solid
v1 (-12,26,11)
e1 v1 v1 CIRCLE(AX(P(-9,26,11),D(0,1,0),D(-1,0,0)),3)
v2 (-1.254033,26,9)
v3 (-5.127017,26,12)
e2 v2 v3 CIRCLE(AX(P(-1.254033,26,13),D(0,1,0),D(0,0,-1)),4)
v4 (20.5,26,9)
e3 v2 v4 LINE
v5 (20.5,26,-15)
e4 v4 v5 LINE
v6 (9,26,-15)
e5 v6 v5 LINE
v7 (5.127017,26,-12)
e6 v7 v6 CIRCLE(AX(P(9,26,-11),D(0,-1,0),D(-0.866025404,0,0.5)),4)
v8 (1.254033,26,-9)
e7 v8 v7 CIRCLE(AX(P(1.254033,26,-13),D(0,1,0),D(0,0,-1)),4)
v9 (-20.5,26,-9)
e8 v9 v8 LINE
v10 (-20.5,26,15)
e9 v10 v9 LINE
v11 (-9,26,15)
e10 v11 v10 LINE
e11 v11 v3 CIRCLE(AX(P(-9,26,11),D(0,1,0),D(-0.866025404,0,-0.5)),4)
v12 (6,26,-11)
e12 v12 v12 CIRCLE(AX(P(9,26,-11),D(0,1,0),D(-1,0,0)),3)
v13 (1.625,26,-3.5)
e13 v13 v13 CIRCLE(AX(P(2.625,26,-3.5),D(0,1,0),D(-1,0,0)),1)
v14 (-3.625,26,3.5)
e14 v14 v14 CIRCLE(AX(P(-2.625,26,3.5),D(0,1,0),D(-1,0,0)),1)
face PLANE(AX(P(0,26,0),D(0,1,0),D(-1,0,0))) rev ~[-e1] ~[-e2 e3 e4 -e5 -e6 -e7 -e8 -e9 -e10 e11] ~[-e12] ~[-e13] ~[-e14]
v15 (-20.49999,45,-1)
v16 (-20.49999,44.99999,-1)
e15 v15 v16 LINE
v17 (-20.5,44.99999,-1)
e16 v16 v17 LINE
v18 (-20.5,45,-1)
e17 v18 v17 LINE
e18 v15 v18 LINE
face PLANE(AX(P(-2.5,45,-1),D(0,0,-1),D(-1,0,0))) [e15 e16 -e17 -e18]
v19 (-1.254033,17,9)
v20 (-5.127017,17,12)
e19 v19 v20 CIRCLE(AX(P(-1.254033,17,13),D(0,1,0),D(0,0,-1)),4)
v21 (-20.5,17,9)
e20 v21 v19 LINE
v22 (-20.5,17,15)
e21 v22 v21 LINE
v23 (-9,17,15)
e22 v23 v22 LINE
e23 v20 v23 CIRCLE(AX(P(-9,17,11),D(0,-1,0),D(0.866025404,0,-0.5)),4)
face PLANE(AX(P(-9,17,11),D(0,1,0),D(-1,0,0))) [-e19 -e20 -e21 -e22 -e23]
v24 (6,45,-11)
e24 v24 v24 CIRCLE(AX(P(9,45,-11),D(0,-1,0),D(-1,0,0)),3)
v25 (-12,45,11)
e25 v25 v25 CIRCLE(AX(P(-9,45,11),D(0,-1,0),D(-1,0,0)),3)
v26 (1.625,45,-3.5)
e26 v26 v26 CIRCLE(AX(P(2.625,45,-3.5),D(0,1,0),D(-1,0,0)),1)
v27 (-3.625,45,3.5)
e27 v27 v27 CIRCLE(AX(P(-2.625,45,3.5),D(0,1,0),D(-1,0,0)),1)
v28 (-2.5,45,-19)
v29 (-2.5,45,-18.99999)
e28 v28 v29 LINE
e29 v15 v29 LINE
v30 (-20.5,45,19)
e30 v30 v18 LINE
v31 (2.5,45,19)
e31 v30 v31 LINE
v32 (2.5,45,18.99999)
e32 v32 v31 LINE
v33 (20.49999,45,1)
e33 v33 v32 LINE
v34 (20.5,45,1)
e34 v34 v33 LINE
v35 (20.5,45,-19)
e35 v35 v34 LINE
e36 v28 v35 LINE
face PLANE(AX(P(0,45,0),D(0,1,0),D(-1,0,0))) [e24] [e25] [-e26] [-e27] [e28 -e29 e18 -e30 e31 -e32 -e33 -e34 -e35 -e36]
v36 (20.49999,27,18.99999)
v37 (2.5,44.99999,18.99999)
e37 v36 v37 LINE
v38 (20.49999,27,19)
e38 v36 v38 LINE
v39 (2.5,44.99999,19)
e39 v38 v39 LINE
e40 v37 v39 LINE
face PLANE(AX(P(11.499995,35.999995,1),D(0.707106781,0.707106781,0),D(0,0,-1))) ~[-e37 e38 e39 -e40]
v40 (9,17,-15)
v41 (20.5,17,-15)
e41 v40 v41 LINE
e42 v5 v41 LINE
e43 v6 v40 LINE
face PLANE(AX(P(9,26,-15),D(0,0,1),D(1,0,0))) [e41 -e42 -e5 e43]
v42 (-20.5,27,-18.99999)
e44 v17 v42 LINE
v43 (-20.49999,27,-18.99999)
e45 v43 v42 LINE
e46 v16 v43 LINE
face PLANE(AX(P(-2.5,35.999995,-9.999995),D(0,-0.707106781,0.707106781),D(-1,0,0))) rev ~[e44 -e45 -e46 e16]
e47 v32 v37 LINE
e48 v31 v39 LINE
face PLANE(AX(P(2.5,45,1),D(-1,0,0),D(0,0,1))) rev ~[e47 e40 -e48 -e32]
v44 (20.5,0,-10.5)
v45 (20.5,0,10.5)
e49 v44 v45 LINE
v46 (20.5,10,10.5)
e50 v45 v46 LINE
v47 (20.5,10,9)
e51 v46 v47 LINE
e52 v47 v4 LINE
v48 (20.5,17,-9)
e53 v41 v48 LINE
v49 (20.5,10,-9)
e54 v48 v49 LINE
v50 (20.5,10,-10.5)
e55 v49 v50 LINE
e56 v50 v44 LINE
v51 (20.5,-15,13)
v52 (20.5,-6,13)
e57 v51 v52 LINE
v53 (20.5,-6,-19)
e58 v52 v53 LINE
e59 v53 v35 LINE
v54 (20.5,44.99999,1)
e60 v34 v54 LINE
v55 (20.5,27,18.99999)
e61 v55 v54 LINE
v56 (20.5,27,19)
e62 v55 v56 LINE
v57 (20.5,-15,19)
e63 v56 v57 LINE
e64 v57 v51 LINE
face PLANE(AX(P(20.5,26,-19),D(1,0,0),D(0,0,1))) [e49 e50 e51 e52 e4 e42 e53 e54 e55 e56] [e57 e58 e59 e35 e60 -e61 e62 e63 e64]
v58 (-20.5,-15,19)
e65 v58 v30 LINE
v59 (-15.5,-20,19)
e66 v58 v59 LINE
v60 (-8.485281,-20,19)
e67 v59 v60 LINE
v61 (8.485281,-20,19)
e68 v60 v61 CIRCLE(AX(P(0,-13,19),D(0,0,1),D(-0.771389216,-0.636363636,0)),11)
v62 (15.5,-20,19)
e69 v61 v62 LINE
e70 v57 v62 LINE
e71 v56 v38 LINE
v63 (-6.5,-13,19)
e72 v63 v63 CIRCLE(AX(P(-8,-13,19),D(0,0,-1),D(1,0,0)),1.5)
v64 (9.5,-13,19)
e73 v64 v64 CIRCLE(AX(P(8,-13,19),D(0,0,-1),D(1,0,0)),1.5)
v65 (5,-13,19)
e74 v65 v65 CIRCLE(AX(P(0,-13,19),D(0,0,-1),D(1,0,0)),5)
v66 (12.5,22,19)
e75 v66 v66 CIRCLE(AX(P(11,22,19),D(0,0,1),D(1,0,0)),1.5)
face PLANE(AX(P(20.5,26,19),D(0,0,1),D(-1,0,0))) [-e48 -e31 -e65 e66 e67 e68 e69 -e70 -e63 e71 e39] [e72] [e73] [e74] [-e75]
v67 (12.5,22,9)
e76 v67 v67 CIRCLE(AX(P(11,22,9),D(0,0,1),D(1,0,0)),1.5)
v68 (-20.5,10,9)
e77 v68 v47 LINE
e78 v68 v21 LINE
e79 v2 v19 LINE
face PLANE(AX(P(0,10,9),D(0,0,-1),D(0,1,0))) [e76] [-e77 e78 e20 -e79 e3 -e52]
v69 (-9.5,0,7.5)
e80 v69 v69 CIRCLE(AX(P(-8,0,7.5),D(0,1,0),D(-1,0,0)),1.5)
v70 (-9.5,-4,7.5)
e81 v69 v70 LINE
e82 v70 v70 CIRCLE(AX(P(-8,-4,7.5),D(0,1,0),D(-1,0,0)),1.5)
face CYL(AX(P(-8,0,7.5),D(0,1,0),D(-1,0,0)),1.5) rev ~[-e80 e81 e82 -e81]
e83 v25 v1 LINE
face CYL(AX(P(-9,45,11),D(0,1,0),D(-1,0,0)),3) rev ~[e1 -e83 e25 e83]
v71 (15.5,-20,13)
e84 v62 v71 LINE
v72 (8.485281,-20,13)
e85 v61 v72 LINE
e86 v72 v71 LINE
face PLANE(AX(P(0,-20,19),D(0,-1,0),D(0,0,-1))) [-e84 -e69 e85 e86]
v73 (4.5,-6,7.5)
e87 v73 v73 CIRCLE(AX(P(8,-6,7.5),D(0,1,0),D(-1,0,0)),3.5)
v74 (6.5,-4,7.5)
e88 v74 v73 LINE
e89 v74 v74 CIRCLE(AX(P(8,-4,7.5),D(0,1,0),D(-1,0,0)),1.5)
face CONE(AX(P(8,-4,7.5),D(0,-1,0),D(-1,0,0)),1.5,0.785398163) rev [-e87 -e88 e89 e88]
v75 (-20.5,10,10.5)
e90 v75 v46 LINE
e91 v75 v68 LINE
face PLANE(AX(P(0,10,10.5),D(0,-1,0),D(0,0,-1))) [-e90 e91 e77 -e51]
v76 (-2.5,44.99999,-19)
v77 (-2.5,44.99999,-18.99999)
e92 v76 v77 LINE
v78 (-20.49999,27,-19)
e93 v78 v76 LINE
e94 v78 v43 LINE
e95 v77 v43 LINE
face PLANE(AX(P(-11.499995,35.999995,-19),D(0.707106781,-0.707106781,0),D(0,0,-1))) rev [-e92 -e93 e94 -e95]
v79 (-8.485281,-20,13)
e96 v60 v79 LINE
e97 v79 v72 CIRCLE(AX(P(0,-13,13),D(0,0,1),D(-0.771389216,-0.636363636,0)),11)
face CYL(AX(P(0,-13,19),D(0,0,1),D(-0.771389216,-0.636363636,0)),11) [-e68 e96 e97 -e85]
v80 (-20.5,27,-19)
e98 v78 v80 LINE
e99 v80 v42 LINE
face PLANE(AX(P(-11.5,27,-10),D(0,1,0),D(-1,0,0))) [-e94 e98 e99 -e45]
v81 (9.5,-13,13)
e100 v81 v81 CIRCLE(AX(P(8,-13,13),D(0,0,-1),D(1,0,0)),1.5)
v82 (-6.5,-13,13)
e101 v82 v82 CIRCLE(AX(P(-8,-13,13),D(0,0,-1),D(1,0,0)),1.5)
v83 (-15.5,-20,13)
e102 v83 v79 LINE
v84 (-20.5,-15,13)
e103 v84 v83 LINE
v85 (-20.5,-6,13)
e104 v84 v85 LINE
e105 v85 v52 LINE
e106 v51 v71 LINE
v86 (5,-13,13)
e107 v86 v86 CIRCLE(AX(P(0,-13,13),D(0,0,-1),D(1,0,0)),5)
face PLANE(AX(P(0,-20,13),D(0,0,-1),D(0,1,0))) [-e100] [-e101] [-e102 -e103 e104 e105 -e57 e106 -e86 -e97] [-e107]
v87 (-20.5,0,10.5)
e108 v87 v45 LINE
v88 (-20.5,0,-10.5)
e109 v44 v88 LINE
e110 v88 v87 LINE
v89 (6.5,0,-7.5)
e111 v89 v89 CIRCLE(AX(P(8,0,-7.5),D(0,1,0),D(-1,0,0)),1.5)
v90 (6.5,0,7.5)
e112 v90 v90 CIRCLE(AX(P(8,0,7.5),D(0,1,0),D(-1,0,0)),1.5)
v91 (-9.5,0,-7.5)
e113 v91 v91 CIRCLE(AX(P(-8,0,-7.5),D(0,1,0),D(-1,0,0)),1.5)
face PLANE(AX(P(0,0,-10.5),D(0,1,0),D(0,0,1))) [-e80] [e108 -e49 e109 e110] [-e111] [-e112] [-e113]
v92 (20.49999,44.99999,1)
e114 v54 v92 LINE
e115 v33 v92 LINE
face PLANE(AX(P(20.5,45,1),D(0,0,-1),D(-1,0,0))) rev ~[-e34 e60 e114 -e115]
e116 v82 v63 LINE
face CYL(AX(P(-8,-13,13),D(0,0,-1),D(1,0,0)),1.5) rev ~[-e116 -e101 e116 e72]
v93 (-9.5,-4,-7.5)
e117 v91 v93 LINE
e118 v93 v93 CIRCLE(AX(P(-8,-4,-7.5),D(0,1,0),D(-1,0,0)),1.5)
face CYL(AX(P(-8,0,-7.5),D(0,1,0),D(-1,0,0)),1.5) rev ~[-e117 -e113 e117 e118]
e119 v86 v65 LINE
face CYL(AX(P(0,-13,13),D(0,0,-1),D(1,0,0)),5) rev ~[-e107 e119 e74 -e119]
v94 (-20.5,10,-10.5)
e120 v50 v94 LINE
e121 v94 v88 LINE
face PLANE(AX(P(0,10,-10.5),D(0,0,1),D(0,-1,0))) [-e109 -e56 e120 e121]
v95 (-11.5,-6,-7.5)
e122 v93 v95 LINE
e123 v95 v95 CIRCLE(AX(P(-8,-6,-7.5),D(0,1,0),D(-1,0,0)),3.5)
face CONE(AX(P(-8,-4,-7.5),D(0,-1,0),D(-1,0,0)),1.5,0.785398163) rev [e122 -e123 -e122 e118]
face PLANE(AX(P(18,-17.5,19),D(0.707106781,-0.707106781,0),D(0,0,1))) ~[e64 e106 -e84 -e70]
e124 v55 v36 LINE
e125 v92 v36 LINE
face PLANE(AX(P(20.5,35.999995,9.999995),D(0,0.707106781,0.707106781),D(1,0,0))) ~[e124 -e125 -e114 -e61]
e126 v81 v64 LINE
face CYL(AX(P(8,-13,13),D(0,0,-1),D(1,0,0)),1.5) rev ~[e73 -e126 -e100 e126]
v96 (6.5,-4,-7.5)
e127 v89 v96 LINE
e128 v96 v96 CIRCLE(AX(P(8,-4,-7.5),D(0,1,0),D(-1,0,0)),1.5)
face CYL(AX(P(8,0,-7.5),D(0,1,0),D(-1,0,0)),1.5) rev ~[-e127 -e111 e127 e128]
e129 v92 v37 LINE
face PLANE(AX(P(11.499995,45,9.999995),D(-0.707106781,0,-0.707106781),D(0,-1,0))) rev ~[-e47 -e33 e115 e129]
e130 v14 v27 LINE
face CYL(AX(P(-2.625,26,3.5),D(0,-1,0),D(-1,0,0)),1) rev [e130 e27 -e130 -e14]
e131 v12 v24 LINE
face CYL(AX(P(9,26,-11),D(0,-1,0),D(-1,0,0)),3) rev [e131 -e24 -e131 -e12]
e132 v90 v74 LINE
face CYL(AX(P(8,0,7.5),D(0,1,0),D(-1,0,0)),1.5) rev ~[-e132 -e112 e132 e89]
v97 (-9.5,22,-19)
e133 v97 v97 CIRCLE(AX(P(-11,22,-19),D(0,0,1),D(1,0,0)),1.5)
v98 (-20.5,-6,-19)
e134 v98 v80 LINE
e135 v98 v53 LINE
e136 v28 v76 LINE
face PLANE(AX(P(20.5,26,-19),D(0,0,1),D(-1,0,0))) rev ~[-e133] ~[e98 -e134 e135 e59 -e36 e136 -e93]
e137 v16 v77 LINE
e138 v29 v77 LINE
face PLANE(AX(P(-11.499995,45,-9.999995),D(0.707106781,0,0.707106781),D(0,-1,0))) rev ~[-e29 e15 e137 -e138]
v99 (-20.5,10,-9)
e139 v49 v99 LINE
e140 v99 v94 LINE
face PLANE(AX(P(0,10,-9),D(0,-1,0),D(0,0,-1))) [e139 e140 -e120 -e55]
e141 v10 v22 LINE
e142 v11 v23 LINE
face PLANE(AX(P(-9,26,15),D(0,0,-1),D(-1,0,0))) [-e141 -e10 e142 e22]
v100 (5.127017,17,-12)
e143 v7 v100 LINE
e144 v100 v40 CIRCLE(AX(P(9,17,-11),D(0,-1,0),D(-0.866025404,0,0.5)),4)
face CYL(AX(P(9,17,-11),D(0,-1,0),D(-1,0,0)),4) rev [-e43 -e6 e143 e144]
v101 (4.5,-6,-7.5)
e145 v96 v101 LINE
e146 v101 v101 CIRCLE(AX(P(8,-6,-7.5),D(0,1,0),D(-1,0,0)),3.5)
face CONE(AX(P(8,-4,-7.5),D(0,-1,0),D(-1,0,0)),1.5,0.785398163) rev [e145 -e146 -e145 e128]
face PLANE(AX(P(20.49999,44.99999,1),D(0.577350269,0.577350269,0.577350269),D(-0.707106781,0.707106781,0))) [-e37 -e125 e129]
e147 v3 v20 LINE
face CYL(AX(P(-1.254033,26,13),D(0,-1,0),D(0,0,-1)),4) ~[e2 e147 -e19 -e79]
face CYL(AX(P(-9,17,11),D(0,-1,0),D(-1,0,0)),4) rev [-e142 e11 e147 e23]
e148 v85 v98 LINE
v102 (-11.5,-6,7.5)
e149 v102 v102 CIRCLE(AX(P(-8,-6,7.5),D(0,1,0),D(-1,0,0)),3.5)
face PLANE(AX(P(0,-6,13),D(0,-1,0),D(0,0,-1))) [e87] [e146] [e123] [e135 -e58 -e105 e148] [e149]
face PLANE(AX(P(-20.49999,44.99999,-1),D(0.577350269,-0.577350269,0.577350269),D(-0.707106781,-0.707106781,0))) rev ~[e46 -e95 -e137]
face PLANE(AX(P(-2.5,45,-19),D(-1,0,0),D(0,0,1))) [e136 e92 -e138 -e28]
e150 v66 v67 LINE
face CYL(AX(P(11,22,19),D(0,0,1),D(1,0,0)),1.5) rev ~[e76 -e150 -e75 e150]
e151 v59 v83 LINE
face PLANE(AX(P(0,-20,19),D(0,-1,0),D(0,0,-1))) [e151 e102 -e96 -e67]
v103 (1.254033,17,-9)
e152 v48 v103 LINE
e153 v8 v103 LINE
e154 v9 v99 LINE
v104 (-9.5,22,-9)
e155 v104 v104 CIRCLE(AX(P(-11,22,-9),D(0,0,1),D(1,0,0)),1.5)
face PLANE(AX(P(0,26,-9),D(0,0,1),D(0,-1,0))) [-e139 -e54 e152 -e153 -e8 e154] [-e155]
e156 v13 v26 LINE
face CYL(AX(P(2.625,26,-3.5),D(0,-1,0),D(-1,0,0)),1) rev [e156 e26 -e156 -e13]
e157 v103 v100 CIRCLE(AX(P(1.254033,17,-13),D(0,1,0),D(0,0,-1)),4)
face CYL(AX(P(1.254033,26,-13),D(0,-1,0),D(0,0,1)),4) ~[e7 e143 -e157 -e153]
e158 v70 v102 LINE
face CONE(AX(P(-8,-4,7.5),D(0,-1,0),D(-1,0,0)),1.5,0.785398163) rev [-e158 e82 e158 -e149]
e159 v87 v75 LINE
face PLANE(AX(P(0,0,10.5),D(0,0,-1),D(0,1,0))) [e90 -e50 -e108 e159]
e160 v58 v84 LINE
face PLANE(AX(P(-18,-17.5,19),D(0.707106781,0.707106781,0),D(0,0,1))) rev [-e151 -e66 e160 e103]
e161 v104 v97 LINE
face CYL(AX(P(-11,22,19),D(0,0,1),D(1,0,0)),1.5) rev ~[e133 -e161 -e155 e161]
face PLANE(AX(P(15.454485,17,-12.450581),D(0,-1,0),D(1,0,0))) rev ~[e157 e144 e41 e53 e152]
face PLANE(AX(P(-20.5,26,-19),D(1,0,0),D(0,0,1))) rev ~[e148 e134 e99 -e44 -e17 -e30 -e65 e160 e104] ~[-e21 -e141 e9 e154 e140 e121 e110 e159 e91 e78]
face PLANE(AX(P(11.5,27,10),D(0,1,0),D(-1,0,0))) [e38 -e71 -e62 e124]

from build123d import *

# Parameters (mm, degrees)
F1_DEPTH  = 20.5
F2_R      = 1.5
F2_R_2    = 5
F3_DEPTH  = 6.001
F5_DEPTH  = 6
F6_R      = 1.5
F7_DEPTH  = 24.001
F8_SIZE   = 2
F9_R      = 1.5
F10_DEPTH = 38.001
F11_W     = 41
F11_H     = 38
F11_R     = 3
F11_R_2   = 1
F12_DEPTH = 19
F13_R     = 3
F14_DEPTH = 28
F16_DEPTH = 28
F17_R     = 4
F18_DEPTH = 9
F19_W     = 18
F19_H     = 18
F20_DEPTH = 18
F21_SIZE  = 17.99999
F22_SIZE  = 5
F24_DEPTH = 9
F25_R     = 4


# Not quite as in the source:
# - a fillet or chamfer is up to 0.001 mm smaller than in the source, because OpenCascade refuses the exact size


with BuildPart() as f1:
    # F0 (on Right) → F1 (new body, symmetric)
    with BuildSketch(Plane.YZ):
        Polygon((0, -10.5), (0, 10.5), (10, 10.5), (10, 9), (26, 9), (26, 19), (-20, 19), (-20, 13), (-6, 13), (-6, -19), (26, -19), (26, -9), (10, -9), (10, -10.5), align=None)
    extrude(amount=F1_DEPTH, both=True)

    # F2 (on face) → F3 (cut, through all)
    with BuildSketch(Plane(origin=(0, 0, 13), x_dir=(1, 0, 0), z_dir=(0, 0, -1))):
        with Locations((-8, 13)):
            Circle(F2_R)
        with Locations((8, 13)):
            Circle(F2_R)
        with Locations((0, 13)):
            Circle(F2_R_2)
    extrude(amount=-F3_DEPTH, mode=Mode.SUBTRACT)

    # F4 (on face) → F5 (join, through all)
    with BuildSketch(Plane.XY.offset(19)):
        with BuildLine():
            ThreePointArc((-8.4852813742, -20), (0, -24), (8.4852813742, -20))
            Line((8.4852813742, -20), (-8.4852813742, -20))
        make_face()
    extrude(amount=-F5_DEPTH)

    # F6 (on face) → F7 (cut, through all)
    with BuildSketch(Plane(origin=(0, 0, 0), x_dir=(-1, 0, 0), z_dir=(0, 1, 0))):
        with Locations((-8, 7.5)):
            Circle(F6_R)
        with Locations((8, 7.5)):
            Circle(F6_R)
        with Locations((8, -7.5)):
            Circle(F6_R)
        with Locations((-8, -7.5)):
            Circle(F6_R)
    extrude(amount=-F7_DEPTH, mode=Mode.SUBTRACT)

    # F8
    f8_edges = [f1.edges().sort_by_distance(p)[0] for p in [
        (-6.5, -6, 7.5),
        (9.5, -6, 7.5),
        (9.5, -6, -7.5),
        (-6.5, -6, -7.5),
    ]]
    chamfer(f8_edges, length=F8_SIZE)

    # F9 (on face) → F10 (cut, through all)
    with BuildSketch(Plane.XY.offset(19)):
        with Locations((-11, 22)):
            Circle(F9_R)
        with Locations((11, 22)):
            Circle(F9_R)
    extrude(amount=-F10_DEPTH, mode=Mode.SUBTRACT)

    # F11 (on face) → F12 (join)
    with BuildSketch(Plane(origin=(0, 26, 0), x_dir=(-1, 0, 0), z_dir=(0, 1, 0))):
        Rectangle(F11_W, F11_H)
        with Locations((-9, -11)):
            Circle(F11_R, mode=Mode.SUBTRACT)
        with Locations((-2.625, -3.5)):
            Circle(F11_R_2, mode=Mode.SUBTRACT)
        with Locations((2.625, 3.5)):
            Circle(F11_R_2, mode=Mode.SUBTRACT)
        with Locations((9, 11)):
            Circle(F11_R, mode=Mode.SUBTRACT)
    extrude(amount=F12_DEPTH)

    # F13 (on face) → F14 (cut)
    with BuildSketch(Plane(origin=(0, 45, 0), x_dir=(-1, 0, 0), z_dir=(0, 1, 0))):
        with Locations((9, 11)):
            Circle(F13_R)
        with Locations((-9, -11)):
            Circle(F13_R)
    extrude(amount=-F14_DEPTH, mode=Mode.SUBTRACT)

    # F15 (on face) → F16 (join, through all)
    with BuildSketch(Plane(origin=(0, 17, 0), x_dir=(-1, 0, 0), z_dir=(0, 1, 0))):
        with BuildLine():
            ThreePointArc((6.7639320225, 9), (9, 14), (11.2360679775, 9))
            Line((11.2360679775, 9), (20.5, 9))
            Line((20.5, 9), (20.5, 19))
            Line((20.5, 19), (0, 19))
            Line((0, 19), (0, 9))
            Line((0, 9), (6.7639320225, 9))
        make_face()
        with BuildLine():
            ThreePointArc((-6.7639320225, -9), (-9, -14), (-11.2360679775, -9))
            Line((-11.2360679775, -9), (-20.5, -9))
            Line((-20.5, -9), (-20.5, -19))
            Line((-20.5, -19), (0, -19))
            Line((0, -19), (0, -9))
            Line((0, -9), (-6.7639320225, -9))
        make_face()
    extrude(amount=F16_DEPTH)

    # F17 (on face) → F18 (cut, through all)
    with BuildSketch(Plane(origin=(0, 17, 0), x_dir=(-1, 0, 0), z_dir=(0, 1, 0))):
        with Locations((9, 11)):
            Circle(F17_R)
        with Locations((-9, -11)):
            Circle(F17_R)
    extrude(amount=F18_DEPTH, mode=Mode.SUBTRACT)

    # F19 (on face) → F20 (cut)
    with BuildSketch(Plane(origin=(0, 45, 0), x_dir=(-1, 0, 0), z_dir=(0, 1, 0))):
        with Locations((-11.5, 10)):
            Rectangle(F19_W, F19_H)
        with Locations((11.5, -10)):
            Rectangle(F19_W, F19_H)
    extrude(amount=-F20_DEPTH, mode=Mode.SUBTRACT)

    # F21 (size 18 in the source; OpenCascade refuses exactly that, so slightly less here)
    f21_edges = [f1.edges().sort_by_distance(p)[0] for p in [
        (2.5, 27, 10),
        (-2.5, 27, -10),
        (11.5, 27, 1),
        (2.5, 36, 1),
        (-2.5, 36, -1),
        (-11.5, 27, -1),
    ]]
    chamfer(f21_edges, length=F21_SIZE)

    # F22
    f22_edges = [f1.edges().sort_by_distance(p)[0] for p in [
        (20.5, -20, 16),
        (-20.5, -20, 16),
    ]]
    chamfer(f22_edges, length=F22_SIZE)

    # F23 (on face) → F24 (cut, through all)
    with BuildSketch(Plane.XZ.offset(-26)):
        with BuildLine():
            Line((20.5, -9), (12.4641016151, -9))
            ThreePointArc((12.4641016151, -9), (12.4641016151, -13), (9, -15))
            Line((9, -15), (20.5, -15))
            Line((20.5, -15), (20.5, -9))
        make_face()
        with BuildLine():
            Line((-20.5, 9), (-12.4641016151, 9))
            ThreePointArc((-12.4641016151, 9), (-12.4641016151, 13), (-9, 15))
            Line((-9, 15), (-20.5, 15))
            Line((-20.5, 15), (-20.5, 9))
        make_face()
    extrude(amount=F24_DEPTH, mode=Mode.SUBTRACT)

    # F25
    f25_edges = [f1.edges().sort_by_distance(p)[0] for p in [
        (-5.535898, 21.5, 9),
        (5.535898, 21.5, -9),
    ]]
    fillet(f25_edges, radius=F25_R)


solid = f1.part
